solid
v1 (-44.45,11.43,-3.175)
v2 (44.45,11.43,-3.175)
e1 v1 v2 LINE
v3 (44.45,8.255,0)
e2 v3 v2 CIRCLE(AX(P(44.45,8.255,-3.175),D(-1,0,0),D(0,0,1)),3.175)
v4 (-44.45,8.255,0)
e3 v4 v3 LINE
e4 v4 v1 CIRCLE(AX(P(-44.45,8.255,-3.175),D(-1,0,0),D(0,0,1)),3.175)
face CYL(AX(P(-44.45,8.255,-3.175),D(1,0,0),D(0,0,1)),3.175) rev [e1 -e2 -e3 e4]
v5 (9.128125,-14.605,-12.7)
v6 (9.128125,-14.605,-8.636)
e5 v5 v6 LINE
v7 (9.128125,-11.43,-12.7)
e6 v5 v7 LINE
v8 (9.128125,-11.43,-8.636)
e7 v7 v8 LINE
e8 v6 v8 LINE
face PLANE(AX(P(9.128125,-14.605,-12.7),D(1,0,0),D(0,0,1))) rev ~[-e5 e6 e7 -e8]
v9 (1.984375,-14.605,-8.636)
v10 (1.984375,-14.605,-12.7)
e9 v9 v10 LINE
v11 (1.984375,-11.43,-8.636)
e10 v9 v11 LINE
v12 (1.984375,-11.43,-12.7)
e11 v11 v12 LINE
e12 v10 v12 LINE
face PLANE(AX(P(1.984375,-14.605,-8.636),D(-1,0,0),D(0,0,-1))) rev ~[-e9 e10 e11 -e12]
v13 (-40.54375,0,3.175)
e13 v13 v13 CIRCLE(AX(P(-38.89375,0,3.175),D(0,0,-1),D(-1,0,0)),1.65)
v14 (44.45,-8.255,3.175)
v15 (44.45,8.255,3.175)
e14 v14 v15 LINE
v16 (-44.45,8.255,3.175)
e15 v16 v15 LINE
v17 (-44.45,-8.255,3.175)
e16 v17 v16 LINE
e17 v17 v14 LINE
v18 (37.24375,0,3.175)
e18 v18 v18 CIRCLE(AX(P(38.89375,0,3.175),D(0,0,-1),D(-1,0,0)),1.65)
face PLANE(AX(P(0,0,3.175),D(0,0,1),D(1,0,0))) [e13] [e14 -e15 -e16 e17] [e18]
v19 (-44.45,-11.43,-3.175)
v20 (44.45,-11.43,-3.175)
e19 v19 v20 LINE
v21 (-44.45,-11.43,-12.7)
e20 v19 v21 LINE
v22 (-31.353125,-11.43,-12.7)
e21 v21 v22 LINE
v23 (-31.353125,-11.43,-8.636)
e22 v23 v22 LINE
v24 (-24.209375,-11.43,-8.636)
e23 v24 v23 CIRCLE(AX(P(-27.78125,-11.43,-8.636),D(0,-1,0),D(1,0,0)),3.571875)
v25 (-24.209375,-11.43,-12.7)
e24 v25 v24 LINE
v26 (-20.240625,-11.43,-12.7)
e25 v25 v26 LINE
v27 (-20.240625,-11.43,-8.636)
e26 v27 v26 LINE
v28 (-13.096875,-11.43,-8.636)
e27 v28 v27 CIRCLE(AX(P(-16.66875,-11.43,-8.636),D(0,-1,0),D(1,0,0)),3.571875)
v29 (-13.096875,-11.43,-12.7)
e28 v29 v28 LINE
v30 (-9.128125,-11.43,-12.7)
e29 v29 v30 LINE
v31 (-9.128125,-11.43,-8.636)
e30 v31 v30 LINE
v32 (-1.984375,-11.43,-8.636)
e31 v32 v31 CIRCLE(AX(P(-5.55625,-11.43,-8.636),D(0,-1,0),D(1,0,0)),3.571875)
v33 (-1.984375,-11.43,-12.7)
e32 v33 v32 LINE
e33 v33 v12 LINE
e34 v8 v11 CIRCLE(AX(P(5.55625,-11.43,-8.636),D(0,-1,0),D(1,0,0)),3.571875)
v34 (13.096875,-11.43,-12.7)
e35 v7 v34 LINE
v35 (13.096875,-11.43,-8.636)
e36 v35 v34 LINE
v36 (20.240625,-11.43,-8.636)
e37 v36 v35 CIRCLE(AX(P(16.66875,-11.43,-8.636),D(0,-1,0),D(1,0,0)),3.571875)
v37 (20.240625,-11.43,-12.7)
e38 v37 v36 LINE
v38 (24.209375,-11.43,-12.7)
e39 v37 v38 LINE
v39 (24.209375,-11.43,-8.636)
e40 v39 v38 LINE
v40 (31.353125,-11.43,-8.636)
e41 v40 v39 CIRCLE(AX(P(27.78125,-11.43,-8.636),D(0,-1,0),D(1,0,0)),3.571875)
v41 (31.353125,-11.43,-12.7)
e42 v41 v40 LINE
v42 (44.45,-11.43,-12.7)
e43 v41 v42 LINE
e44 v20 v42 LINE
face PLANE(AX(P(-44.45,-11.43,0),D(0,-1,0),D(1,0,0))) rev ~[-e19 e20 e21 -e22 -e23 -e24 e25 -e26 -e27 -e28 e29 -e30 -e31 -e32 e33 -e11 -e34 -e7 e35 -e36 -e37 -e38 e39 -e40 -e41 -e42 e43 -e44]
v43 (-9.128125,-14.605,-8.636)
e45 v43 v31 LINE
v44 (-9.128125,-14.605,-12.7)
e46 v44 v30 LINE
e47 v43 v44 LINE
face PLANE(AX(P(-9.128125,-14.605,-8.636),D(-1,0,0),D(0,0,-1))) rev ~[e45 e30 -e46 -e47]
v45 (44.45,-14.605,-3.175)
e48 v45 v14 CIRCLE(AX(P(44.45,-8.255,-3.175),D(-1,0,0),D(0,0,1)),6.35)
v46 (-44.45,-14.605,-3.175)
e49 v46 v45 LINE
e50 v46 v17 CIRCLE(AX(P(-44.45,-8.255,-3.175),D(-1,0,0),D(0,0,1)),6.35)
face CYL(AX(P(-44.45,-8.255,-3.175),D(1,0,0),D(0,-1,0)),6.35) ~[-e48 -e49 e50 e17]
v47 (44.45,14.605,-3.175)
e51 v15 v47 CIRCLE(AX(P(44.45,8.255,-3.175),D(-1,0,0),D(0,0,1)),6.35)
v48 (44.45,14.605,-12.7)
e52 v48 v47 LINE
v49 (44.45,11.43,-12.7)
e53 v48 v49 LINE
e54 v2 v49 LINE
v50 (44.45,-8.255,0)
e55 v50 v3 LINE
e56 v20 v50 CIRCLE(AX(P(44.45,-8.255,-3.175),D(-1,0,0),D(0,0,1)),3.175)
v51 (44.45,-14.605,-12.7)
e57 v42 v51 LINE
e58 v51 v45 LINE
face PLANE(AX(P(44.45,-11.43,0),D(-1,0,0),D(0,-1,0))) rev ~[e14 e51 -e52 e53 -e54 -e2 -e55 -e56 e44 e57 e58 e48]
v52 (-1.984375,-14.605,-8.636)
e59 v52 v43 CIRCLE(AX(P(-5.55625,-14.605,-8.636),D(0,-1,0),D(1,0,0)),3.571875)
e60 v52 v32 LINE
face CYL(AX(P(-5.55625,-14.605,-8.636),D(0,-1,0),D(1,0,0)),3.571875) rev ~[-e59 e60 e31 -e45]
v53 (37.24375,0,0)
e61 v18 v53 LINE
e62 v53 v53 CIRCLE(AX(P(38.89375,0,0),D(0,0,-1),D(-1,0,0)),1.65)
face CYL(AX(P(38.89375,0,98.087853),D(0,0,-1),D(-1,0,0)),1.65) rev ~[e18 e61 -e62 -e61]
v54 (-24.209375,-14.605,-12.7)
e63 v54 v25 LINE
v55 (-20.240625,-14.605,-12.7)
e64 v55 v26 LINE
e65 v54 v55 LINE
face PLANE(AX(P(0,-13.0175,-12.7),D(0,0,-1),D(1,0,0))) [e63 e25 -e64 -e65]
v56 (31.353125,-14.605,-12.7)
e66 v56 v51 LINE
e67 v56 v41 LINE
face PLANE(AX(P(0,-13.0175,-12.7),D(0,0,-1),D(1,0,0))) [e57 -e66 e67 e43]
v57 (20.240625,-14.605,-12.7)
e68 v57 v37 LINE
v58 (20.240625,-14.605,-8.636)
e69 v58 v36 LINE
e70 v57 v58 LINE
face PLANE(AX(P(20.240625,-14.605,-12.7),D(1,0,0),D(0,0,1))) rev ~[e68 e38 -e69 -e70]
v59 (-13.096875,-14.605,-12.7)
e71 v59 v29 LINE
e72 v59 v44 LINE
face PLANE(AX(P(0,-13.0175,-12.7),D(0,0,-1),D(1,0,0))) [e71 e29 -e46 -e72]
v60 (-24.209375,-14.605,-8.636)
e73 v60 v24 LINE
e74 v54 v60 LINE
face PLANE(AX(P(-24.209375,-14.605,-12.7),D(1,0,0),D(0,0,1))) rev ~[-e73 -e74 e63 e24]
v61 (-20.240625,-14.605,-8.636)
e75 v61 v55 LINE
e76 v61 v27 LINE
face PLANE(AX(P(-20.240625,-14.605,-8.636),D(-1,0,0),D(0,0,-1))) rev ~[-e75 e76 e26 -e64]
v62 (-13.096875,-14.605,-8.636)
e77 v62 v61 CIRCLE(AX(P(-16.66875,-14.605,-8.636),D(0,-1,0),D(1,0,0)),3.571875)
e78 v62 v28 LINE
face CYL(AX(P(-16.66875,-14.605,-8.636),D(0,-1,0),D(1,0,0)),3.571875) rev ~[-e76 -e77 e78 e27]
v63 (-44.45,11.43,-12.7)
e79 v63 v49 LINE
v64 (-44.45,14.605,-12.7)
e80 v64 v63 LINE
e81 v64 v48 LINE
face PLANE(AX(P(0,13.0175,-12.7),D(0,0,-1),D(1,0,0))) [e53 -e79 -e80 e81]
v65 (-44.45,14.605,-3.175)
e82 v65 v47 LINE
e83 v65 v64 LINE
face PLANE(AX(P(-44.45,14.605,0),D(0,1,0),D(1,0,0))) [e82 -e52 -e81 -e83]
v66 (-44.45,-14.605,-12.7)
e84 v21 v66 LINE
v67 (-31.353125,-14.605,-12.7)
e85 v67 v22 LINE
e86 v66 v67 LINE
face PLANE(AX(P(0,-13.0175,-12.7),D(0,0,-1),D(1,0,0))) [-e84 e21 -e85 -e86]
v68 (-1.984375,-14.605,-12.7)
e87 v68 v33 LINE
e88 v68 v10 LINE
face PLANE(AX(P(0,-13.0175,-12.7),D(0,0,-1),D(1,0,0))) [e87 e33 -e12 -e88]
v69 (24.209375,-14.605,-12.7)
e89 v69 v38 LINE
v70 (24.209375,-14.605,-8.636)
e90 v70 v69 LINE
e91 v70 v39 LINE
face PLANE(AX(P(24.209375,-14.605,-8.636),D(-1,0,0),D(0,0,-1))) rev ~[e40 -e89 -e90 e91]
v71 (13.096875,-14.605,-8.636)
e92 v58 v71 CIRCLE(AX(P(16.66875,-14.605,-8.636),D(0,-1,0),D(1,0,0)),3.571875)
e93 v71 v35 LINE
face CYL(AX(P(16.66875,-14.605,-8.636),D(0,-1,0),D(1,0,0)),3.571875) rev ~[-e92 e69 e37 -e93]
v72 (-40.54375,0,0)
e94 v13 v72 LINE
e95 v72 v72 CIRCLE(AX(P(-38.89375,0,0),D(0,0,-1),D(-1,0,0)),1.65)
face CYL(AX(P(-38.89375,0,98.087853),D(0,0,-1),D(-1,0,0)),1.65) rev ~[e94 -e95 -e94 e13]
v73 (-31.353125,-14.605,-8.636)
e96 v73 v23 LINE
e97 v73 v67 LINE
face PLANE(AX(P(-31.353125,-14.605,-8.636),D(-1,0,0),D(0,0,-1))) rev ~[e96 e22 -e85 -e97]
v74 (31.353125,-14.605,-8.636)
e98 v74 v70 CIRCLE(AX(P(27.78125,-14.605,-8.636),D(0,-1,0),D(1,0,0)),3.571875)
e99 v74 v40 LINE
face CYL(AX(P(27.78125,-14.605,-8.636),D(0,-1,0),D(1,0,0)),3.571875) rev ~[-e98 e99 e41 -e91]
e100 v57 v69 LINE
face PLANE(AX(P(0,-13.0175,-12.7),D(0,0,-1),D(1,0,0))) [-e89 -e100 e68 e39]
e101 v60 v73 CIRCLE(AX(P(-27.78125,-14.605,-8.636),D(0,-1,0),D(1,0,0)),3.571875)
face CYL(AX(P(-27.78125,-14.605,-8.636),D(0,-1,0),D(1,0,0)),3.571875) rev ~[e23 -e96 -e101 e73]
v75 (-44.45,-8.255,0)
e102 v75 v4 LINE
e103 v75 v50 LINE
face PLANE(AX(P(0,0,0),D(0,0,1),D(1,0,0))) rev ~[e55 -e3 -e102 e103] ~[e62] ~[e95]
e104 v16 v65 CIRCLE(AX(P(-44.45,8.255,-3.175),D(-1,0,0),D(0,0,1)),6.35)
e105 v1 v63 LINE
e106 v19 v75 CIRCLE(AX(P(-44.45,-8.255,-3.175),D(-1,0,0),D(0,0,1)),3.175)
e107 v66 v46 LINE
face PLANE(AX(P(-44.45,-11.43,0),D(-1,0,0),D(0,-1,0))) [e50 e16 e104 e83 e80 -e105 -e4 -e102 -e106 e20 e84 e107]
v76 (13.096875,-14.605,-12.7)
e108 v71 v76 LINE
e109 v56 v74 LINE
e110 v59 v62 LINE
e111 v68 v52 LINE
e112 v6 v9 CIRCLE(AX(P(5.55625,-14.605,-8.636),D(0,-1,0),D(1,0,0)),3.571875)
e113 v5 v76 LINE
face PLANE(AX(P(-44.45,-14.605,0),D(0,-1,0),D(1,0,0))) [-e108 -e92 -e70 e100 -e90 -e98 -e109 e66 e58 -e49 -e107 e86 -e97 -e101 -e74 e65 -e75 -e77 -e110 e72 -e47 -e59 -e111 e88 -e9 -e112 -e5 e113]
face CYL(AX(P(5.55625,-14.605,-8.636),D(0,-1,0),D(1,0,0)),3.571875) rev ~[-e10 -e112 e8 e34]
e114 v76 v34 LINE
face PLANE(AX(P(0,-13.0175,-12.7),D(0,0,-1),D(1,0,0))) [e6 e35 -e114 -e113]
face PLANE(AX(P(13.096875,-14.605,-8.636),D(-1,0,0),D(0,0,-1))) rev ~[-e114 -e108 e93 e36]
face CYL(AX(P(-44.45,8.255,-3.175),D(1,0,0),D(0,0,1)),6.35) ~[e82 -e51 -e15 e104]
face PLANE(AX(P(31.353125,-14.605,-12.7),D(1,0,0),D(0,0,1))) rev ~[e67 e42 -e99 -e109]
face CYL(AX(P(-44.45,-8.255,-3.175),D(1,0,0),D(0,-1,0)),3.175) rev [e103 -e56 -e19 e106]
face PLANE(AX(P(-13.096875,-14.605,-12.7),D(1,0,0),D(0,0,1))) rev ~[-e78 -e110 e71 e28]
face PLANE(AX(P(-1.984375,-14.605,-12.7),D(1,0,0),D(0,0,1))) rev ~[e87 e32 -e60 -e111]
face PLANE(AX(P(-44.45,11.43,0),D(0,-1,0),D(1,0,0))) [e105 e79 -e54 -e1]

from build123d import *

# Parameters (mm, degrees)
F1_W     = 88.9
F1_H     = 29.21
F2_DEPTH = 3.175
F3_W     = 88.9
F3_H     = 3.175
F4_DEPTH = 12.7
F6_D     = 3.3
F8_DEPTH = 3.175
F9_R     = 6.35
F10_R    = 3.175


# Not quite as in the source:
# - a variable given as a bare number and used for a length is read in inches; the dataset says mm whatever the document's units were


with BuildPart() as f2:
    # F1 (on Top) → F2 (new body)
    with BuildSketch(Plane.XY):
        Rectangle(F1_W, F1_H)
    extrude(amount=F2_DEPTH)

    # F3 (on face) → F4 (join)
    with BuildSketch(Plane(origin=(0, 0, 0), x_dir=(1, 0, 0), z_dir=(0, 0, -1))):
        with Locations((0, 13.0175)):
            Rectangle(F3_W, F3_H)
        with Locations((0, -13.0175)):
            Rectangle(F3_W, F3_H)
    extrude(amount=F4_DEPTH)

    # F6 (through all)
    with Locations(Plane.XY.offset(3.175)):
        with Locations((-38.89375, 0), (38.89375, 0)):
            Hole(F6_D / 2)

    # F7 (on face) → F8 (cut)
    with BuildSketch(Plane.XZ.offset(14.605)):
        with BuildLine():
            Line((-31.353125, -8.636), (-24.209375, -8.636))
            ThreePointArc((-24.209375, -8.636), (-27.78125, -5.064125), (-31.353125, -8.636))
        make_face()
        with BuildLine():
            Line((-24.209375, -12.7), (-24.209375, -8.636))
            ThreePointArc((-24.209375, -8.636), (-27.78125, -12.207875), (-31.353125, -8.636))
            Line((-31.353125, -8.636), (-31.353125, -12.7))
            Line((-31.353125, -12.7), (-24.209375, -12.7))
        make_face()
        with BuildLine():
            ThreePointArc((-31.353125, -8.636), (-27.78125, -12.207875), (-24.209375, -8.636))
            Line((-24.209375, -8.636), (-31.353125, -8.636))
        make_face()
        with BuildLine():
            Line((-20.240625, -8.636), (-13.096875, -8.636))
            ThreePointArc((-13.096875, -8.636), (-16.66875, -5.064125), (-20.240625, -8.636))
        make_face()
        with BuildLine():
            Line((-13.096875, -12.7), (-13.096875, -8.636))
            ThreePointArc((-13.096875, -8.636), (-16.66875, -12.207875), (-20.240625, -8.636))
            Line((-20.240625, -8.636), (-20.240625, -12.7))
            Line((-20.240625, -12.7), (-13.096875, -12.7))
        make_face()
        with BuildLine():
            ThreePointArc((-20.240625, -8.636), (-16.66875, -12.207875), (-13.096875, -8.636))
            Line((-13.096875, -8.636), (-20.240625, -8.636))
        make_face()
        with BuildLine():
            Line((-9.128125, -8.636), (-1.984375, -8.636))
            ThreePointArc((-1.984375, -8.636), (-5.55625, -5.064125), (-9.128125, -8.636))
        make_face()
        with BuildLine():
            Line((-1.984375, -12.7), (-1.984375, -8.636))
            ThreePointArc((-1.984375, -8.636), (-5.55625, -12.207875), (-9.128125, -8.636))
            Line((-9.128125, -8.636), (-9.128125, -12.7))
            Line((-9.128125, -12.7), (-1.984375, -12.7))
        make_face()
        with BuildLine():
            ThreePointArc((-9.128125, -8.636), (-5.55625, -12.207875), (-1.984375, -8.636))
            Line((-1.984375, -8.636), (-9.128125, -8.636))
        make_face()
        with BuildLine():
            Line((1.984375, -8.636), (9.128125, -8.636))
            ThreePointArc((9.128125, -8.636), (5.55625, -5.064125), (1.984375, -8.636))
        make_face()
        with BuildLine():
            Line((9.128125, -12.7), (9.128125, -8.636))
            ThreePointArc((9.128125, -8.636), (5.55625, -12.207875), (1.984375, -8.636))
            Line((1.984375, -8.636), (1.984375, -12.7))
            Line((1.984375, -12.7), (9.128125, -12.7))
        make_face()
        with BuildLine():
            ThreePointArc((1.984375, -8.636), (5.55625, -12.207875), (9.128125, -8.636))
            Line((9.128125, -8.636), (1.984375, -8.636))
        make_face()
        with BuildLine():
            Line((13.096875, -8.636), (20.240625, -8.636))
            ThreePointArc((20.240625, -8.636), (16.66875, -5.064125), (13.096875, -8.636))
        make_face()
        with BuildLine():
            Line((20.240625, -12.7), (20.240625, -8.636))
            ThreePointArc((20.240625, -8.636), (16.66875, -12.207875), (13.096875, -8.636))
            Line((13.096875, -8.636), (13.096875, -12.7))
            Line((13.096875, -12.7), (20.240625, -12.7))
        make_face()
        with BuildLine():
            ThreePointArc((13.096875, -8.636), (16.66875, -12.207875), (20.240625, -8.636))
            Line((20.240625, -8.636), (13.096875, -8.636))
        make_face()
        with BuildLine():
            Line((24.209375, -8.636), (31.353125, -8.636))
            ThreePointArc((31.353125, -8.636), (27.78125, -5.064125), (24.209375, -8.636))
        make_face()
        with BuildLine():
            Line((31.353125, -12.7), (31.353125, -8.636))
            ThreePointArc((31.353125, -8.636), (27.78125, -12.207875), (24.209375, -8.636))
            Line((24.209375, -8.636), (24.209375, -12.7))
            Line((24.209375, -12.7), (31.353125, -12.7))
        make_face()
        with BuildLine():
            ThreePointArc((24.209375, -8.636), (27.78125, -12.207875), (31.353125, -8.636))
            Line((31.353125, -8.636), (24.209375, -8.636))
        make_face()
    extrude(amount=-F8_DEPTH, mode=Mode.SUBTRACT)

    # F9
    f9_edges = [f2.edges().sort_by_distance(p)[0] for p in [
        (0, -14.605, 3.175),
        (0, 14.605, 3.175),
    ]]
    fillet(f9_edges, radius=F9_R)

    # F10
    f10_edges = [f2.edges().sort_by_distance(p)[0] for p in [
        (0, 11.43, 0),
        (0, -11.43, 0),
    ]]
    fillet(f10_edges, radius=F10_R)


solid = f2.part
